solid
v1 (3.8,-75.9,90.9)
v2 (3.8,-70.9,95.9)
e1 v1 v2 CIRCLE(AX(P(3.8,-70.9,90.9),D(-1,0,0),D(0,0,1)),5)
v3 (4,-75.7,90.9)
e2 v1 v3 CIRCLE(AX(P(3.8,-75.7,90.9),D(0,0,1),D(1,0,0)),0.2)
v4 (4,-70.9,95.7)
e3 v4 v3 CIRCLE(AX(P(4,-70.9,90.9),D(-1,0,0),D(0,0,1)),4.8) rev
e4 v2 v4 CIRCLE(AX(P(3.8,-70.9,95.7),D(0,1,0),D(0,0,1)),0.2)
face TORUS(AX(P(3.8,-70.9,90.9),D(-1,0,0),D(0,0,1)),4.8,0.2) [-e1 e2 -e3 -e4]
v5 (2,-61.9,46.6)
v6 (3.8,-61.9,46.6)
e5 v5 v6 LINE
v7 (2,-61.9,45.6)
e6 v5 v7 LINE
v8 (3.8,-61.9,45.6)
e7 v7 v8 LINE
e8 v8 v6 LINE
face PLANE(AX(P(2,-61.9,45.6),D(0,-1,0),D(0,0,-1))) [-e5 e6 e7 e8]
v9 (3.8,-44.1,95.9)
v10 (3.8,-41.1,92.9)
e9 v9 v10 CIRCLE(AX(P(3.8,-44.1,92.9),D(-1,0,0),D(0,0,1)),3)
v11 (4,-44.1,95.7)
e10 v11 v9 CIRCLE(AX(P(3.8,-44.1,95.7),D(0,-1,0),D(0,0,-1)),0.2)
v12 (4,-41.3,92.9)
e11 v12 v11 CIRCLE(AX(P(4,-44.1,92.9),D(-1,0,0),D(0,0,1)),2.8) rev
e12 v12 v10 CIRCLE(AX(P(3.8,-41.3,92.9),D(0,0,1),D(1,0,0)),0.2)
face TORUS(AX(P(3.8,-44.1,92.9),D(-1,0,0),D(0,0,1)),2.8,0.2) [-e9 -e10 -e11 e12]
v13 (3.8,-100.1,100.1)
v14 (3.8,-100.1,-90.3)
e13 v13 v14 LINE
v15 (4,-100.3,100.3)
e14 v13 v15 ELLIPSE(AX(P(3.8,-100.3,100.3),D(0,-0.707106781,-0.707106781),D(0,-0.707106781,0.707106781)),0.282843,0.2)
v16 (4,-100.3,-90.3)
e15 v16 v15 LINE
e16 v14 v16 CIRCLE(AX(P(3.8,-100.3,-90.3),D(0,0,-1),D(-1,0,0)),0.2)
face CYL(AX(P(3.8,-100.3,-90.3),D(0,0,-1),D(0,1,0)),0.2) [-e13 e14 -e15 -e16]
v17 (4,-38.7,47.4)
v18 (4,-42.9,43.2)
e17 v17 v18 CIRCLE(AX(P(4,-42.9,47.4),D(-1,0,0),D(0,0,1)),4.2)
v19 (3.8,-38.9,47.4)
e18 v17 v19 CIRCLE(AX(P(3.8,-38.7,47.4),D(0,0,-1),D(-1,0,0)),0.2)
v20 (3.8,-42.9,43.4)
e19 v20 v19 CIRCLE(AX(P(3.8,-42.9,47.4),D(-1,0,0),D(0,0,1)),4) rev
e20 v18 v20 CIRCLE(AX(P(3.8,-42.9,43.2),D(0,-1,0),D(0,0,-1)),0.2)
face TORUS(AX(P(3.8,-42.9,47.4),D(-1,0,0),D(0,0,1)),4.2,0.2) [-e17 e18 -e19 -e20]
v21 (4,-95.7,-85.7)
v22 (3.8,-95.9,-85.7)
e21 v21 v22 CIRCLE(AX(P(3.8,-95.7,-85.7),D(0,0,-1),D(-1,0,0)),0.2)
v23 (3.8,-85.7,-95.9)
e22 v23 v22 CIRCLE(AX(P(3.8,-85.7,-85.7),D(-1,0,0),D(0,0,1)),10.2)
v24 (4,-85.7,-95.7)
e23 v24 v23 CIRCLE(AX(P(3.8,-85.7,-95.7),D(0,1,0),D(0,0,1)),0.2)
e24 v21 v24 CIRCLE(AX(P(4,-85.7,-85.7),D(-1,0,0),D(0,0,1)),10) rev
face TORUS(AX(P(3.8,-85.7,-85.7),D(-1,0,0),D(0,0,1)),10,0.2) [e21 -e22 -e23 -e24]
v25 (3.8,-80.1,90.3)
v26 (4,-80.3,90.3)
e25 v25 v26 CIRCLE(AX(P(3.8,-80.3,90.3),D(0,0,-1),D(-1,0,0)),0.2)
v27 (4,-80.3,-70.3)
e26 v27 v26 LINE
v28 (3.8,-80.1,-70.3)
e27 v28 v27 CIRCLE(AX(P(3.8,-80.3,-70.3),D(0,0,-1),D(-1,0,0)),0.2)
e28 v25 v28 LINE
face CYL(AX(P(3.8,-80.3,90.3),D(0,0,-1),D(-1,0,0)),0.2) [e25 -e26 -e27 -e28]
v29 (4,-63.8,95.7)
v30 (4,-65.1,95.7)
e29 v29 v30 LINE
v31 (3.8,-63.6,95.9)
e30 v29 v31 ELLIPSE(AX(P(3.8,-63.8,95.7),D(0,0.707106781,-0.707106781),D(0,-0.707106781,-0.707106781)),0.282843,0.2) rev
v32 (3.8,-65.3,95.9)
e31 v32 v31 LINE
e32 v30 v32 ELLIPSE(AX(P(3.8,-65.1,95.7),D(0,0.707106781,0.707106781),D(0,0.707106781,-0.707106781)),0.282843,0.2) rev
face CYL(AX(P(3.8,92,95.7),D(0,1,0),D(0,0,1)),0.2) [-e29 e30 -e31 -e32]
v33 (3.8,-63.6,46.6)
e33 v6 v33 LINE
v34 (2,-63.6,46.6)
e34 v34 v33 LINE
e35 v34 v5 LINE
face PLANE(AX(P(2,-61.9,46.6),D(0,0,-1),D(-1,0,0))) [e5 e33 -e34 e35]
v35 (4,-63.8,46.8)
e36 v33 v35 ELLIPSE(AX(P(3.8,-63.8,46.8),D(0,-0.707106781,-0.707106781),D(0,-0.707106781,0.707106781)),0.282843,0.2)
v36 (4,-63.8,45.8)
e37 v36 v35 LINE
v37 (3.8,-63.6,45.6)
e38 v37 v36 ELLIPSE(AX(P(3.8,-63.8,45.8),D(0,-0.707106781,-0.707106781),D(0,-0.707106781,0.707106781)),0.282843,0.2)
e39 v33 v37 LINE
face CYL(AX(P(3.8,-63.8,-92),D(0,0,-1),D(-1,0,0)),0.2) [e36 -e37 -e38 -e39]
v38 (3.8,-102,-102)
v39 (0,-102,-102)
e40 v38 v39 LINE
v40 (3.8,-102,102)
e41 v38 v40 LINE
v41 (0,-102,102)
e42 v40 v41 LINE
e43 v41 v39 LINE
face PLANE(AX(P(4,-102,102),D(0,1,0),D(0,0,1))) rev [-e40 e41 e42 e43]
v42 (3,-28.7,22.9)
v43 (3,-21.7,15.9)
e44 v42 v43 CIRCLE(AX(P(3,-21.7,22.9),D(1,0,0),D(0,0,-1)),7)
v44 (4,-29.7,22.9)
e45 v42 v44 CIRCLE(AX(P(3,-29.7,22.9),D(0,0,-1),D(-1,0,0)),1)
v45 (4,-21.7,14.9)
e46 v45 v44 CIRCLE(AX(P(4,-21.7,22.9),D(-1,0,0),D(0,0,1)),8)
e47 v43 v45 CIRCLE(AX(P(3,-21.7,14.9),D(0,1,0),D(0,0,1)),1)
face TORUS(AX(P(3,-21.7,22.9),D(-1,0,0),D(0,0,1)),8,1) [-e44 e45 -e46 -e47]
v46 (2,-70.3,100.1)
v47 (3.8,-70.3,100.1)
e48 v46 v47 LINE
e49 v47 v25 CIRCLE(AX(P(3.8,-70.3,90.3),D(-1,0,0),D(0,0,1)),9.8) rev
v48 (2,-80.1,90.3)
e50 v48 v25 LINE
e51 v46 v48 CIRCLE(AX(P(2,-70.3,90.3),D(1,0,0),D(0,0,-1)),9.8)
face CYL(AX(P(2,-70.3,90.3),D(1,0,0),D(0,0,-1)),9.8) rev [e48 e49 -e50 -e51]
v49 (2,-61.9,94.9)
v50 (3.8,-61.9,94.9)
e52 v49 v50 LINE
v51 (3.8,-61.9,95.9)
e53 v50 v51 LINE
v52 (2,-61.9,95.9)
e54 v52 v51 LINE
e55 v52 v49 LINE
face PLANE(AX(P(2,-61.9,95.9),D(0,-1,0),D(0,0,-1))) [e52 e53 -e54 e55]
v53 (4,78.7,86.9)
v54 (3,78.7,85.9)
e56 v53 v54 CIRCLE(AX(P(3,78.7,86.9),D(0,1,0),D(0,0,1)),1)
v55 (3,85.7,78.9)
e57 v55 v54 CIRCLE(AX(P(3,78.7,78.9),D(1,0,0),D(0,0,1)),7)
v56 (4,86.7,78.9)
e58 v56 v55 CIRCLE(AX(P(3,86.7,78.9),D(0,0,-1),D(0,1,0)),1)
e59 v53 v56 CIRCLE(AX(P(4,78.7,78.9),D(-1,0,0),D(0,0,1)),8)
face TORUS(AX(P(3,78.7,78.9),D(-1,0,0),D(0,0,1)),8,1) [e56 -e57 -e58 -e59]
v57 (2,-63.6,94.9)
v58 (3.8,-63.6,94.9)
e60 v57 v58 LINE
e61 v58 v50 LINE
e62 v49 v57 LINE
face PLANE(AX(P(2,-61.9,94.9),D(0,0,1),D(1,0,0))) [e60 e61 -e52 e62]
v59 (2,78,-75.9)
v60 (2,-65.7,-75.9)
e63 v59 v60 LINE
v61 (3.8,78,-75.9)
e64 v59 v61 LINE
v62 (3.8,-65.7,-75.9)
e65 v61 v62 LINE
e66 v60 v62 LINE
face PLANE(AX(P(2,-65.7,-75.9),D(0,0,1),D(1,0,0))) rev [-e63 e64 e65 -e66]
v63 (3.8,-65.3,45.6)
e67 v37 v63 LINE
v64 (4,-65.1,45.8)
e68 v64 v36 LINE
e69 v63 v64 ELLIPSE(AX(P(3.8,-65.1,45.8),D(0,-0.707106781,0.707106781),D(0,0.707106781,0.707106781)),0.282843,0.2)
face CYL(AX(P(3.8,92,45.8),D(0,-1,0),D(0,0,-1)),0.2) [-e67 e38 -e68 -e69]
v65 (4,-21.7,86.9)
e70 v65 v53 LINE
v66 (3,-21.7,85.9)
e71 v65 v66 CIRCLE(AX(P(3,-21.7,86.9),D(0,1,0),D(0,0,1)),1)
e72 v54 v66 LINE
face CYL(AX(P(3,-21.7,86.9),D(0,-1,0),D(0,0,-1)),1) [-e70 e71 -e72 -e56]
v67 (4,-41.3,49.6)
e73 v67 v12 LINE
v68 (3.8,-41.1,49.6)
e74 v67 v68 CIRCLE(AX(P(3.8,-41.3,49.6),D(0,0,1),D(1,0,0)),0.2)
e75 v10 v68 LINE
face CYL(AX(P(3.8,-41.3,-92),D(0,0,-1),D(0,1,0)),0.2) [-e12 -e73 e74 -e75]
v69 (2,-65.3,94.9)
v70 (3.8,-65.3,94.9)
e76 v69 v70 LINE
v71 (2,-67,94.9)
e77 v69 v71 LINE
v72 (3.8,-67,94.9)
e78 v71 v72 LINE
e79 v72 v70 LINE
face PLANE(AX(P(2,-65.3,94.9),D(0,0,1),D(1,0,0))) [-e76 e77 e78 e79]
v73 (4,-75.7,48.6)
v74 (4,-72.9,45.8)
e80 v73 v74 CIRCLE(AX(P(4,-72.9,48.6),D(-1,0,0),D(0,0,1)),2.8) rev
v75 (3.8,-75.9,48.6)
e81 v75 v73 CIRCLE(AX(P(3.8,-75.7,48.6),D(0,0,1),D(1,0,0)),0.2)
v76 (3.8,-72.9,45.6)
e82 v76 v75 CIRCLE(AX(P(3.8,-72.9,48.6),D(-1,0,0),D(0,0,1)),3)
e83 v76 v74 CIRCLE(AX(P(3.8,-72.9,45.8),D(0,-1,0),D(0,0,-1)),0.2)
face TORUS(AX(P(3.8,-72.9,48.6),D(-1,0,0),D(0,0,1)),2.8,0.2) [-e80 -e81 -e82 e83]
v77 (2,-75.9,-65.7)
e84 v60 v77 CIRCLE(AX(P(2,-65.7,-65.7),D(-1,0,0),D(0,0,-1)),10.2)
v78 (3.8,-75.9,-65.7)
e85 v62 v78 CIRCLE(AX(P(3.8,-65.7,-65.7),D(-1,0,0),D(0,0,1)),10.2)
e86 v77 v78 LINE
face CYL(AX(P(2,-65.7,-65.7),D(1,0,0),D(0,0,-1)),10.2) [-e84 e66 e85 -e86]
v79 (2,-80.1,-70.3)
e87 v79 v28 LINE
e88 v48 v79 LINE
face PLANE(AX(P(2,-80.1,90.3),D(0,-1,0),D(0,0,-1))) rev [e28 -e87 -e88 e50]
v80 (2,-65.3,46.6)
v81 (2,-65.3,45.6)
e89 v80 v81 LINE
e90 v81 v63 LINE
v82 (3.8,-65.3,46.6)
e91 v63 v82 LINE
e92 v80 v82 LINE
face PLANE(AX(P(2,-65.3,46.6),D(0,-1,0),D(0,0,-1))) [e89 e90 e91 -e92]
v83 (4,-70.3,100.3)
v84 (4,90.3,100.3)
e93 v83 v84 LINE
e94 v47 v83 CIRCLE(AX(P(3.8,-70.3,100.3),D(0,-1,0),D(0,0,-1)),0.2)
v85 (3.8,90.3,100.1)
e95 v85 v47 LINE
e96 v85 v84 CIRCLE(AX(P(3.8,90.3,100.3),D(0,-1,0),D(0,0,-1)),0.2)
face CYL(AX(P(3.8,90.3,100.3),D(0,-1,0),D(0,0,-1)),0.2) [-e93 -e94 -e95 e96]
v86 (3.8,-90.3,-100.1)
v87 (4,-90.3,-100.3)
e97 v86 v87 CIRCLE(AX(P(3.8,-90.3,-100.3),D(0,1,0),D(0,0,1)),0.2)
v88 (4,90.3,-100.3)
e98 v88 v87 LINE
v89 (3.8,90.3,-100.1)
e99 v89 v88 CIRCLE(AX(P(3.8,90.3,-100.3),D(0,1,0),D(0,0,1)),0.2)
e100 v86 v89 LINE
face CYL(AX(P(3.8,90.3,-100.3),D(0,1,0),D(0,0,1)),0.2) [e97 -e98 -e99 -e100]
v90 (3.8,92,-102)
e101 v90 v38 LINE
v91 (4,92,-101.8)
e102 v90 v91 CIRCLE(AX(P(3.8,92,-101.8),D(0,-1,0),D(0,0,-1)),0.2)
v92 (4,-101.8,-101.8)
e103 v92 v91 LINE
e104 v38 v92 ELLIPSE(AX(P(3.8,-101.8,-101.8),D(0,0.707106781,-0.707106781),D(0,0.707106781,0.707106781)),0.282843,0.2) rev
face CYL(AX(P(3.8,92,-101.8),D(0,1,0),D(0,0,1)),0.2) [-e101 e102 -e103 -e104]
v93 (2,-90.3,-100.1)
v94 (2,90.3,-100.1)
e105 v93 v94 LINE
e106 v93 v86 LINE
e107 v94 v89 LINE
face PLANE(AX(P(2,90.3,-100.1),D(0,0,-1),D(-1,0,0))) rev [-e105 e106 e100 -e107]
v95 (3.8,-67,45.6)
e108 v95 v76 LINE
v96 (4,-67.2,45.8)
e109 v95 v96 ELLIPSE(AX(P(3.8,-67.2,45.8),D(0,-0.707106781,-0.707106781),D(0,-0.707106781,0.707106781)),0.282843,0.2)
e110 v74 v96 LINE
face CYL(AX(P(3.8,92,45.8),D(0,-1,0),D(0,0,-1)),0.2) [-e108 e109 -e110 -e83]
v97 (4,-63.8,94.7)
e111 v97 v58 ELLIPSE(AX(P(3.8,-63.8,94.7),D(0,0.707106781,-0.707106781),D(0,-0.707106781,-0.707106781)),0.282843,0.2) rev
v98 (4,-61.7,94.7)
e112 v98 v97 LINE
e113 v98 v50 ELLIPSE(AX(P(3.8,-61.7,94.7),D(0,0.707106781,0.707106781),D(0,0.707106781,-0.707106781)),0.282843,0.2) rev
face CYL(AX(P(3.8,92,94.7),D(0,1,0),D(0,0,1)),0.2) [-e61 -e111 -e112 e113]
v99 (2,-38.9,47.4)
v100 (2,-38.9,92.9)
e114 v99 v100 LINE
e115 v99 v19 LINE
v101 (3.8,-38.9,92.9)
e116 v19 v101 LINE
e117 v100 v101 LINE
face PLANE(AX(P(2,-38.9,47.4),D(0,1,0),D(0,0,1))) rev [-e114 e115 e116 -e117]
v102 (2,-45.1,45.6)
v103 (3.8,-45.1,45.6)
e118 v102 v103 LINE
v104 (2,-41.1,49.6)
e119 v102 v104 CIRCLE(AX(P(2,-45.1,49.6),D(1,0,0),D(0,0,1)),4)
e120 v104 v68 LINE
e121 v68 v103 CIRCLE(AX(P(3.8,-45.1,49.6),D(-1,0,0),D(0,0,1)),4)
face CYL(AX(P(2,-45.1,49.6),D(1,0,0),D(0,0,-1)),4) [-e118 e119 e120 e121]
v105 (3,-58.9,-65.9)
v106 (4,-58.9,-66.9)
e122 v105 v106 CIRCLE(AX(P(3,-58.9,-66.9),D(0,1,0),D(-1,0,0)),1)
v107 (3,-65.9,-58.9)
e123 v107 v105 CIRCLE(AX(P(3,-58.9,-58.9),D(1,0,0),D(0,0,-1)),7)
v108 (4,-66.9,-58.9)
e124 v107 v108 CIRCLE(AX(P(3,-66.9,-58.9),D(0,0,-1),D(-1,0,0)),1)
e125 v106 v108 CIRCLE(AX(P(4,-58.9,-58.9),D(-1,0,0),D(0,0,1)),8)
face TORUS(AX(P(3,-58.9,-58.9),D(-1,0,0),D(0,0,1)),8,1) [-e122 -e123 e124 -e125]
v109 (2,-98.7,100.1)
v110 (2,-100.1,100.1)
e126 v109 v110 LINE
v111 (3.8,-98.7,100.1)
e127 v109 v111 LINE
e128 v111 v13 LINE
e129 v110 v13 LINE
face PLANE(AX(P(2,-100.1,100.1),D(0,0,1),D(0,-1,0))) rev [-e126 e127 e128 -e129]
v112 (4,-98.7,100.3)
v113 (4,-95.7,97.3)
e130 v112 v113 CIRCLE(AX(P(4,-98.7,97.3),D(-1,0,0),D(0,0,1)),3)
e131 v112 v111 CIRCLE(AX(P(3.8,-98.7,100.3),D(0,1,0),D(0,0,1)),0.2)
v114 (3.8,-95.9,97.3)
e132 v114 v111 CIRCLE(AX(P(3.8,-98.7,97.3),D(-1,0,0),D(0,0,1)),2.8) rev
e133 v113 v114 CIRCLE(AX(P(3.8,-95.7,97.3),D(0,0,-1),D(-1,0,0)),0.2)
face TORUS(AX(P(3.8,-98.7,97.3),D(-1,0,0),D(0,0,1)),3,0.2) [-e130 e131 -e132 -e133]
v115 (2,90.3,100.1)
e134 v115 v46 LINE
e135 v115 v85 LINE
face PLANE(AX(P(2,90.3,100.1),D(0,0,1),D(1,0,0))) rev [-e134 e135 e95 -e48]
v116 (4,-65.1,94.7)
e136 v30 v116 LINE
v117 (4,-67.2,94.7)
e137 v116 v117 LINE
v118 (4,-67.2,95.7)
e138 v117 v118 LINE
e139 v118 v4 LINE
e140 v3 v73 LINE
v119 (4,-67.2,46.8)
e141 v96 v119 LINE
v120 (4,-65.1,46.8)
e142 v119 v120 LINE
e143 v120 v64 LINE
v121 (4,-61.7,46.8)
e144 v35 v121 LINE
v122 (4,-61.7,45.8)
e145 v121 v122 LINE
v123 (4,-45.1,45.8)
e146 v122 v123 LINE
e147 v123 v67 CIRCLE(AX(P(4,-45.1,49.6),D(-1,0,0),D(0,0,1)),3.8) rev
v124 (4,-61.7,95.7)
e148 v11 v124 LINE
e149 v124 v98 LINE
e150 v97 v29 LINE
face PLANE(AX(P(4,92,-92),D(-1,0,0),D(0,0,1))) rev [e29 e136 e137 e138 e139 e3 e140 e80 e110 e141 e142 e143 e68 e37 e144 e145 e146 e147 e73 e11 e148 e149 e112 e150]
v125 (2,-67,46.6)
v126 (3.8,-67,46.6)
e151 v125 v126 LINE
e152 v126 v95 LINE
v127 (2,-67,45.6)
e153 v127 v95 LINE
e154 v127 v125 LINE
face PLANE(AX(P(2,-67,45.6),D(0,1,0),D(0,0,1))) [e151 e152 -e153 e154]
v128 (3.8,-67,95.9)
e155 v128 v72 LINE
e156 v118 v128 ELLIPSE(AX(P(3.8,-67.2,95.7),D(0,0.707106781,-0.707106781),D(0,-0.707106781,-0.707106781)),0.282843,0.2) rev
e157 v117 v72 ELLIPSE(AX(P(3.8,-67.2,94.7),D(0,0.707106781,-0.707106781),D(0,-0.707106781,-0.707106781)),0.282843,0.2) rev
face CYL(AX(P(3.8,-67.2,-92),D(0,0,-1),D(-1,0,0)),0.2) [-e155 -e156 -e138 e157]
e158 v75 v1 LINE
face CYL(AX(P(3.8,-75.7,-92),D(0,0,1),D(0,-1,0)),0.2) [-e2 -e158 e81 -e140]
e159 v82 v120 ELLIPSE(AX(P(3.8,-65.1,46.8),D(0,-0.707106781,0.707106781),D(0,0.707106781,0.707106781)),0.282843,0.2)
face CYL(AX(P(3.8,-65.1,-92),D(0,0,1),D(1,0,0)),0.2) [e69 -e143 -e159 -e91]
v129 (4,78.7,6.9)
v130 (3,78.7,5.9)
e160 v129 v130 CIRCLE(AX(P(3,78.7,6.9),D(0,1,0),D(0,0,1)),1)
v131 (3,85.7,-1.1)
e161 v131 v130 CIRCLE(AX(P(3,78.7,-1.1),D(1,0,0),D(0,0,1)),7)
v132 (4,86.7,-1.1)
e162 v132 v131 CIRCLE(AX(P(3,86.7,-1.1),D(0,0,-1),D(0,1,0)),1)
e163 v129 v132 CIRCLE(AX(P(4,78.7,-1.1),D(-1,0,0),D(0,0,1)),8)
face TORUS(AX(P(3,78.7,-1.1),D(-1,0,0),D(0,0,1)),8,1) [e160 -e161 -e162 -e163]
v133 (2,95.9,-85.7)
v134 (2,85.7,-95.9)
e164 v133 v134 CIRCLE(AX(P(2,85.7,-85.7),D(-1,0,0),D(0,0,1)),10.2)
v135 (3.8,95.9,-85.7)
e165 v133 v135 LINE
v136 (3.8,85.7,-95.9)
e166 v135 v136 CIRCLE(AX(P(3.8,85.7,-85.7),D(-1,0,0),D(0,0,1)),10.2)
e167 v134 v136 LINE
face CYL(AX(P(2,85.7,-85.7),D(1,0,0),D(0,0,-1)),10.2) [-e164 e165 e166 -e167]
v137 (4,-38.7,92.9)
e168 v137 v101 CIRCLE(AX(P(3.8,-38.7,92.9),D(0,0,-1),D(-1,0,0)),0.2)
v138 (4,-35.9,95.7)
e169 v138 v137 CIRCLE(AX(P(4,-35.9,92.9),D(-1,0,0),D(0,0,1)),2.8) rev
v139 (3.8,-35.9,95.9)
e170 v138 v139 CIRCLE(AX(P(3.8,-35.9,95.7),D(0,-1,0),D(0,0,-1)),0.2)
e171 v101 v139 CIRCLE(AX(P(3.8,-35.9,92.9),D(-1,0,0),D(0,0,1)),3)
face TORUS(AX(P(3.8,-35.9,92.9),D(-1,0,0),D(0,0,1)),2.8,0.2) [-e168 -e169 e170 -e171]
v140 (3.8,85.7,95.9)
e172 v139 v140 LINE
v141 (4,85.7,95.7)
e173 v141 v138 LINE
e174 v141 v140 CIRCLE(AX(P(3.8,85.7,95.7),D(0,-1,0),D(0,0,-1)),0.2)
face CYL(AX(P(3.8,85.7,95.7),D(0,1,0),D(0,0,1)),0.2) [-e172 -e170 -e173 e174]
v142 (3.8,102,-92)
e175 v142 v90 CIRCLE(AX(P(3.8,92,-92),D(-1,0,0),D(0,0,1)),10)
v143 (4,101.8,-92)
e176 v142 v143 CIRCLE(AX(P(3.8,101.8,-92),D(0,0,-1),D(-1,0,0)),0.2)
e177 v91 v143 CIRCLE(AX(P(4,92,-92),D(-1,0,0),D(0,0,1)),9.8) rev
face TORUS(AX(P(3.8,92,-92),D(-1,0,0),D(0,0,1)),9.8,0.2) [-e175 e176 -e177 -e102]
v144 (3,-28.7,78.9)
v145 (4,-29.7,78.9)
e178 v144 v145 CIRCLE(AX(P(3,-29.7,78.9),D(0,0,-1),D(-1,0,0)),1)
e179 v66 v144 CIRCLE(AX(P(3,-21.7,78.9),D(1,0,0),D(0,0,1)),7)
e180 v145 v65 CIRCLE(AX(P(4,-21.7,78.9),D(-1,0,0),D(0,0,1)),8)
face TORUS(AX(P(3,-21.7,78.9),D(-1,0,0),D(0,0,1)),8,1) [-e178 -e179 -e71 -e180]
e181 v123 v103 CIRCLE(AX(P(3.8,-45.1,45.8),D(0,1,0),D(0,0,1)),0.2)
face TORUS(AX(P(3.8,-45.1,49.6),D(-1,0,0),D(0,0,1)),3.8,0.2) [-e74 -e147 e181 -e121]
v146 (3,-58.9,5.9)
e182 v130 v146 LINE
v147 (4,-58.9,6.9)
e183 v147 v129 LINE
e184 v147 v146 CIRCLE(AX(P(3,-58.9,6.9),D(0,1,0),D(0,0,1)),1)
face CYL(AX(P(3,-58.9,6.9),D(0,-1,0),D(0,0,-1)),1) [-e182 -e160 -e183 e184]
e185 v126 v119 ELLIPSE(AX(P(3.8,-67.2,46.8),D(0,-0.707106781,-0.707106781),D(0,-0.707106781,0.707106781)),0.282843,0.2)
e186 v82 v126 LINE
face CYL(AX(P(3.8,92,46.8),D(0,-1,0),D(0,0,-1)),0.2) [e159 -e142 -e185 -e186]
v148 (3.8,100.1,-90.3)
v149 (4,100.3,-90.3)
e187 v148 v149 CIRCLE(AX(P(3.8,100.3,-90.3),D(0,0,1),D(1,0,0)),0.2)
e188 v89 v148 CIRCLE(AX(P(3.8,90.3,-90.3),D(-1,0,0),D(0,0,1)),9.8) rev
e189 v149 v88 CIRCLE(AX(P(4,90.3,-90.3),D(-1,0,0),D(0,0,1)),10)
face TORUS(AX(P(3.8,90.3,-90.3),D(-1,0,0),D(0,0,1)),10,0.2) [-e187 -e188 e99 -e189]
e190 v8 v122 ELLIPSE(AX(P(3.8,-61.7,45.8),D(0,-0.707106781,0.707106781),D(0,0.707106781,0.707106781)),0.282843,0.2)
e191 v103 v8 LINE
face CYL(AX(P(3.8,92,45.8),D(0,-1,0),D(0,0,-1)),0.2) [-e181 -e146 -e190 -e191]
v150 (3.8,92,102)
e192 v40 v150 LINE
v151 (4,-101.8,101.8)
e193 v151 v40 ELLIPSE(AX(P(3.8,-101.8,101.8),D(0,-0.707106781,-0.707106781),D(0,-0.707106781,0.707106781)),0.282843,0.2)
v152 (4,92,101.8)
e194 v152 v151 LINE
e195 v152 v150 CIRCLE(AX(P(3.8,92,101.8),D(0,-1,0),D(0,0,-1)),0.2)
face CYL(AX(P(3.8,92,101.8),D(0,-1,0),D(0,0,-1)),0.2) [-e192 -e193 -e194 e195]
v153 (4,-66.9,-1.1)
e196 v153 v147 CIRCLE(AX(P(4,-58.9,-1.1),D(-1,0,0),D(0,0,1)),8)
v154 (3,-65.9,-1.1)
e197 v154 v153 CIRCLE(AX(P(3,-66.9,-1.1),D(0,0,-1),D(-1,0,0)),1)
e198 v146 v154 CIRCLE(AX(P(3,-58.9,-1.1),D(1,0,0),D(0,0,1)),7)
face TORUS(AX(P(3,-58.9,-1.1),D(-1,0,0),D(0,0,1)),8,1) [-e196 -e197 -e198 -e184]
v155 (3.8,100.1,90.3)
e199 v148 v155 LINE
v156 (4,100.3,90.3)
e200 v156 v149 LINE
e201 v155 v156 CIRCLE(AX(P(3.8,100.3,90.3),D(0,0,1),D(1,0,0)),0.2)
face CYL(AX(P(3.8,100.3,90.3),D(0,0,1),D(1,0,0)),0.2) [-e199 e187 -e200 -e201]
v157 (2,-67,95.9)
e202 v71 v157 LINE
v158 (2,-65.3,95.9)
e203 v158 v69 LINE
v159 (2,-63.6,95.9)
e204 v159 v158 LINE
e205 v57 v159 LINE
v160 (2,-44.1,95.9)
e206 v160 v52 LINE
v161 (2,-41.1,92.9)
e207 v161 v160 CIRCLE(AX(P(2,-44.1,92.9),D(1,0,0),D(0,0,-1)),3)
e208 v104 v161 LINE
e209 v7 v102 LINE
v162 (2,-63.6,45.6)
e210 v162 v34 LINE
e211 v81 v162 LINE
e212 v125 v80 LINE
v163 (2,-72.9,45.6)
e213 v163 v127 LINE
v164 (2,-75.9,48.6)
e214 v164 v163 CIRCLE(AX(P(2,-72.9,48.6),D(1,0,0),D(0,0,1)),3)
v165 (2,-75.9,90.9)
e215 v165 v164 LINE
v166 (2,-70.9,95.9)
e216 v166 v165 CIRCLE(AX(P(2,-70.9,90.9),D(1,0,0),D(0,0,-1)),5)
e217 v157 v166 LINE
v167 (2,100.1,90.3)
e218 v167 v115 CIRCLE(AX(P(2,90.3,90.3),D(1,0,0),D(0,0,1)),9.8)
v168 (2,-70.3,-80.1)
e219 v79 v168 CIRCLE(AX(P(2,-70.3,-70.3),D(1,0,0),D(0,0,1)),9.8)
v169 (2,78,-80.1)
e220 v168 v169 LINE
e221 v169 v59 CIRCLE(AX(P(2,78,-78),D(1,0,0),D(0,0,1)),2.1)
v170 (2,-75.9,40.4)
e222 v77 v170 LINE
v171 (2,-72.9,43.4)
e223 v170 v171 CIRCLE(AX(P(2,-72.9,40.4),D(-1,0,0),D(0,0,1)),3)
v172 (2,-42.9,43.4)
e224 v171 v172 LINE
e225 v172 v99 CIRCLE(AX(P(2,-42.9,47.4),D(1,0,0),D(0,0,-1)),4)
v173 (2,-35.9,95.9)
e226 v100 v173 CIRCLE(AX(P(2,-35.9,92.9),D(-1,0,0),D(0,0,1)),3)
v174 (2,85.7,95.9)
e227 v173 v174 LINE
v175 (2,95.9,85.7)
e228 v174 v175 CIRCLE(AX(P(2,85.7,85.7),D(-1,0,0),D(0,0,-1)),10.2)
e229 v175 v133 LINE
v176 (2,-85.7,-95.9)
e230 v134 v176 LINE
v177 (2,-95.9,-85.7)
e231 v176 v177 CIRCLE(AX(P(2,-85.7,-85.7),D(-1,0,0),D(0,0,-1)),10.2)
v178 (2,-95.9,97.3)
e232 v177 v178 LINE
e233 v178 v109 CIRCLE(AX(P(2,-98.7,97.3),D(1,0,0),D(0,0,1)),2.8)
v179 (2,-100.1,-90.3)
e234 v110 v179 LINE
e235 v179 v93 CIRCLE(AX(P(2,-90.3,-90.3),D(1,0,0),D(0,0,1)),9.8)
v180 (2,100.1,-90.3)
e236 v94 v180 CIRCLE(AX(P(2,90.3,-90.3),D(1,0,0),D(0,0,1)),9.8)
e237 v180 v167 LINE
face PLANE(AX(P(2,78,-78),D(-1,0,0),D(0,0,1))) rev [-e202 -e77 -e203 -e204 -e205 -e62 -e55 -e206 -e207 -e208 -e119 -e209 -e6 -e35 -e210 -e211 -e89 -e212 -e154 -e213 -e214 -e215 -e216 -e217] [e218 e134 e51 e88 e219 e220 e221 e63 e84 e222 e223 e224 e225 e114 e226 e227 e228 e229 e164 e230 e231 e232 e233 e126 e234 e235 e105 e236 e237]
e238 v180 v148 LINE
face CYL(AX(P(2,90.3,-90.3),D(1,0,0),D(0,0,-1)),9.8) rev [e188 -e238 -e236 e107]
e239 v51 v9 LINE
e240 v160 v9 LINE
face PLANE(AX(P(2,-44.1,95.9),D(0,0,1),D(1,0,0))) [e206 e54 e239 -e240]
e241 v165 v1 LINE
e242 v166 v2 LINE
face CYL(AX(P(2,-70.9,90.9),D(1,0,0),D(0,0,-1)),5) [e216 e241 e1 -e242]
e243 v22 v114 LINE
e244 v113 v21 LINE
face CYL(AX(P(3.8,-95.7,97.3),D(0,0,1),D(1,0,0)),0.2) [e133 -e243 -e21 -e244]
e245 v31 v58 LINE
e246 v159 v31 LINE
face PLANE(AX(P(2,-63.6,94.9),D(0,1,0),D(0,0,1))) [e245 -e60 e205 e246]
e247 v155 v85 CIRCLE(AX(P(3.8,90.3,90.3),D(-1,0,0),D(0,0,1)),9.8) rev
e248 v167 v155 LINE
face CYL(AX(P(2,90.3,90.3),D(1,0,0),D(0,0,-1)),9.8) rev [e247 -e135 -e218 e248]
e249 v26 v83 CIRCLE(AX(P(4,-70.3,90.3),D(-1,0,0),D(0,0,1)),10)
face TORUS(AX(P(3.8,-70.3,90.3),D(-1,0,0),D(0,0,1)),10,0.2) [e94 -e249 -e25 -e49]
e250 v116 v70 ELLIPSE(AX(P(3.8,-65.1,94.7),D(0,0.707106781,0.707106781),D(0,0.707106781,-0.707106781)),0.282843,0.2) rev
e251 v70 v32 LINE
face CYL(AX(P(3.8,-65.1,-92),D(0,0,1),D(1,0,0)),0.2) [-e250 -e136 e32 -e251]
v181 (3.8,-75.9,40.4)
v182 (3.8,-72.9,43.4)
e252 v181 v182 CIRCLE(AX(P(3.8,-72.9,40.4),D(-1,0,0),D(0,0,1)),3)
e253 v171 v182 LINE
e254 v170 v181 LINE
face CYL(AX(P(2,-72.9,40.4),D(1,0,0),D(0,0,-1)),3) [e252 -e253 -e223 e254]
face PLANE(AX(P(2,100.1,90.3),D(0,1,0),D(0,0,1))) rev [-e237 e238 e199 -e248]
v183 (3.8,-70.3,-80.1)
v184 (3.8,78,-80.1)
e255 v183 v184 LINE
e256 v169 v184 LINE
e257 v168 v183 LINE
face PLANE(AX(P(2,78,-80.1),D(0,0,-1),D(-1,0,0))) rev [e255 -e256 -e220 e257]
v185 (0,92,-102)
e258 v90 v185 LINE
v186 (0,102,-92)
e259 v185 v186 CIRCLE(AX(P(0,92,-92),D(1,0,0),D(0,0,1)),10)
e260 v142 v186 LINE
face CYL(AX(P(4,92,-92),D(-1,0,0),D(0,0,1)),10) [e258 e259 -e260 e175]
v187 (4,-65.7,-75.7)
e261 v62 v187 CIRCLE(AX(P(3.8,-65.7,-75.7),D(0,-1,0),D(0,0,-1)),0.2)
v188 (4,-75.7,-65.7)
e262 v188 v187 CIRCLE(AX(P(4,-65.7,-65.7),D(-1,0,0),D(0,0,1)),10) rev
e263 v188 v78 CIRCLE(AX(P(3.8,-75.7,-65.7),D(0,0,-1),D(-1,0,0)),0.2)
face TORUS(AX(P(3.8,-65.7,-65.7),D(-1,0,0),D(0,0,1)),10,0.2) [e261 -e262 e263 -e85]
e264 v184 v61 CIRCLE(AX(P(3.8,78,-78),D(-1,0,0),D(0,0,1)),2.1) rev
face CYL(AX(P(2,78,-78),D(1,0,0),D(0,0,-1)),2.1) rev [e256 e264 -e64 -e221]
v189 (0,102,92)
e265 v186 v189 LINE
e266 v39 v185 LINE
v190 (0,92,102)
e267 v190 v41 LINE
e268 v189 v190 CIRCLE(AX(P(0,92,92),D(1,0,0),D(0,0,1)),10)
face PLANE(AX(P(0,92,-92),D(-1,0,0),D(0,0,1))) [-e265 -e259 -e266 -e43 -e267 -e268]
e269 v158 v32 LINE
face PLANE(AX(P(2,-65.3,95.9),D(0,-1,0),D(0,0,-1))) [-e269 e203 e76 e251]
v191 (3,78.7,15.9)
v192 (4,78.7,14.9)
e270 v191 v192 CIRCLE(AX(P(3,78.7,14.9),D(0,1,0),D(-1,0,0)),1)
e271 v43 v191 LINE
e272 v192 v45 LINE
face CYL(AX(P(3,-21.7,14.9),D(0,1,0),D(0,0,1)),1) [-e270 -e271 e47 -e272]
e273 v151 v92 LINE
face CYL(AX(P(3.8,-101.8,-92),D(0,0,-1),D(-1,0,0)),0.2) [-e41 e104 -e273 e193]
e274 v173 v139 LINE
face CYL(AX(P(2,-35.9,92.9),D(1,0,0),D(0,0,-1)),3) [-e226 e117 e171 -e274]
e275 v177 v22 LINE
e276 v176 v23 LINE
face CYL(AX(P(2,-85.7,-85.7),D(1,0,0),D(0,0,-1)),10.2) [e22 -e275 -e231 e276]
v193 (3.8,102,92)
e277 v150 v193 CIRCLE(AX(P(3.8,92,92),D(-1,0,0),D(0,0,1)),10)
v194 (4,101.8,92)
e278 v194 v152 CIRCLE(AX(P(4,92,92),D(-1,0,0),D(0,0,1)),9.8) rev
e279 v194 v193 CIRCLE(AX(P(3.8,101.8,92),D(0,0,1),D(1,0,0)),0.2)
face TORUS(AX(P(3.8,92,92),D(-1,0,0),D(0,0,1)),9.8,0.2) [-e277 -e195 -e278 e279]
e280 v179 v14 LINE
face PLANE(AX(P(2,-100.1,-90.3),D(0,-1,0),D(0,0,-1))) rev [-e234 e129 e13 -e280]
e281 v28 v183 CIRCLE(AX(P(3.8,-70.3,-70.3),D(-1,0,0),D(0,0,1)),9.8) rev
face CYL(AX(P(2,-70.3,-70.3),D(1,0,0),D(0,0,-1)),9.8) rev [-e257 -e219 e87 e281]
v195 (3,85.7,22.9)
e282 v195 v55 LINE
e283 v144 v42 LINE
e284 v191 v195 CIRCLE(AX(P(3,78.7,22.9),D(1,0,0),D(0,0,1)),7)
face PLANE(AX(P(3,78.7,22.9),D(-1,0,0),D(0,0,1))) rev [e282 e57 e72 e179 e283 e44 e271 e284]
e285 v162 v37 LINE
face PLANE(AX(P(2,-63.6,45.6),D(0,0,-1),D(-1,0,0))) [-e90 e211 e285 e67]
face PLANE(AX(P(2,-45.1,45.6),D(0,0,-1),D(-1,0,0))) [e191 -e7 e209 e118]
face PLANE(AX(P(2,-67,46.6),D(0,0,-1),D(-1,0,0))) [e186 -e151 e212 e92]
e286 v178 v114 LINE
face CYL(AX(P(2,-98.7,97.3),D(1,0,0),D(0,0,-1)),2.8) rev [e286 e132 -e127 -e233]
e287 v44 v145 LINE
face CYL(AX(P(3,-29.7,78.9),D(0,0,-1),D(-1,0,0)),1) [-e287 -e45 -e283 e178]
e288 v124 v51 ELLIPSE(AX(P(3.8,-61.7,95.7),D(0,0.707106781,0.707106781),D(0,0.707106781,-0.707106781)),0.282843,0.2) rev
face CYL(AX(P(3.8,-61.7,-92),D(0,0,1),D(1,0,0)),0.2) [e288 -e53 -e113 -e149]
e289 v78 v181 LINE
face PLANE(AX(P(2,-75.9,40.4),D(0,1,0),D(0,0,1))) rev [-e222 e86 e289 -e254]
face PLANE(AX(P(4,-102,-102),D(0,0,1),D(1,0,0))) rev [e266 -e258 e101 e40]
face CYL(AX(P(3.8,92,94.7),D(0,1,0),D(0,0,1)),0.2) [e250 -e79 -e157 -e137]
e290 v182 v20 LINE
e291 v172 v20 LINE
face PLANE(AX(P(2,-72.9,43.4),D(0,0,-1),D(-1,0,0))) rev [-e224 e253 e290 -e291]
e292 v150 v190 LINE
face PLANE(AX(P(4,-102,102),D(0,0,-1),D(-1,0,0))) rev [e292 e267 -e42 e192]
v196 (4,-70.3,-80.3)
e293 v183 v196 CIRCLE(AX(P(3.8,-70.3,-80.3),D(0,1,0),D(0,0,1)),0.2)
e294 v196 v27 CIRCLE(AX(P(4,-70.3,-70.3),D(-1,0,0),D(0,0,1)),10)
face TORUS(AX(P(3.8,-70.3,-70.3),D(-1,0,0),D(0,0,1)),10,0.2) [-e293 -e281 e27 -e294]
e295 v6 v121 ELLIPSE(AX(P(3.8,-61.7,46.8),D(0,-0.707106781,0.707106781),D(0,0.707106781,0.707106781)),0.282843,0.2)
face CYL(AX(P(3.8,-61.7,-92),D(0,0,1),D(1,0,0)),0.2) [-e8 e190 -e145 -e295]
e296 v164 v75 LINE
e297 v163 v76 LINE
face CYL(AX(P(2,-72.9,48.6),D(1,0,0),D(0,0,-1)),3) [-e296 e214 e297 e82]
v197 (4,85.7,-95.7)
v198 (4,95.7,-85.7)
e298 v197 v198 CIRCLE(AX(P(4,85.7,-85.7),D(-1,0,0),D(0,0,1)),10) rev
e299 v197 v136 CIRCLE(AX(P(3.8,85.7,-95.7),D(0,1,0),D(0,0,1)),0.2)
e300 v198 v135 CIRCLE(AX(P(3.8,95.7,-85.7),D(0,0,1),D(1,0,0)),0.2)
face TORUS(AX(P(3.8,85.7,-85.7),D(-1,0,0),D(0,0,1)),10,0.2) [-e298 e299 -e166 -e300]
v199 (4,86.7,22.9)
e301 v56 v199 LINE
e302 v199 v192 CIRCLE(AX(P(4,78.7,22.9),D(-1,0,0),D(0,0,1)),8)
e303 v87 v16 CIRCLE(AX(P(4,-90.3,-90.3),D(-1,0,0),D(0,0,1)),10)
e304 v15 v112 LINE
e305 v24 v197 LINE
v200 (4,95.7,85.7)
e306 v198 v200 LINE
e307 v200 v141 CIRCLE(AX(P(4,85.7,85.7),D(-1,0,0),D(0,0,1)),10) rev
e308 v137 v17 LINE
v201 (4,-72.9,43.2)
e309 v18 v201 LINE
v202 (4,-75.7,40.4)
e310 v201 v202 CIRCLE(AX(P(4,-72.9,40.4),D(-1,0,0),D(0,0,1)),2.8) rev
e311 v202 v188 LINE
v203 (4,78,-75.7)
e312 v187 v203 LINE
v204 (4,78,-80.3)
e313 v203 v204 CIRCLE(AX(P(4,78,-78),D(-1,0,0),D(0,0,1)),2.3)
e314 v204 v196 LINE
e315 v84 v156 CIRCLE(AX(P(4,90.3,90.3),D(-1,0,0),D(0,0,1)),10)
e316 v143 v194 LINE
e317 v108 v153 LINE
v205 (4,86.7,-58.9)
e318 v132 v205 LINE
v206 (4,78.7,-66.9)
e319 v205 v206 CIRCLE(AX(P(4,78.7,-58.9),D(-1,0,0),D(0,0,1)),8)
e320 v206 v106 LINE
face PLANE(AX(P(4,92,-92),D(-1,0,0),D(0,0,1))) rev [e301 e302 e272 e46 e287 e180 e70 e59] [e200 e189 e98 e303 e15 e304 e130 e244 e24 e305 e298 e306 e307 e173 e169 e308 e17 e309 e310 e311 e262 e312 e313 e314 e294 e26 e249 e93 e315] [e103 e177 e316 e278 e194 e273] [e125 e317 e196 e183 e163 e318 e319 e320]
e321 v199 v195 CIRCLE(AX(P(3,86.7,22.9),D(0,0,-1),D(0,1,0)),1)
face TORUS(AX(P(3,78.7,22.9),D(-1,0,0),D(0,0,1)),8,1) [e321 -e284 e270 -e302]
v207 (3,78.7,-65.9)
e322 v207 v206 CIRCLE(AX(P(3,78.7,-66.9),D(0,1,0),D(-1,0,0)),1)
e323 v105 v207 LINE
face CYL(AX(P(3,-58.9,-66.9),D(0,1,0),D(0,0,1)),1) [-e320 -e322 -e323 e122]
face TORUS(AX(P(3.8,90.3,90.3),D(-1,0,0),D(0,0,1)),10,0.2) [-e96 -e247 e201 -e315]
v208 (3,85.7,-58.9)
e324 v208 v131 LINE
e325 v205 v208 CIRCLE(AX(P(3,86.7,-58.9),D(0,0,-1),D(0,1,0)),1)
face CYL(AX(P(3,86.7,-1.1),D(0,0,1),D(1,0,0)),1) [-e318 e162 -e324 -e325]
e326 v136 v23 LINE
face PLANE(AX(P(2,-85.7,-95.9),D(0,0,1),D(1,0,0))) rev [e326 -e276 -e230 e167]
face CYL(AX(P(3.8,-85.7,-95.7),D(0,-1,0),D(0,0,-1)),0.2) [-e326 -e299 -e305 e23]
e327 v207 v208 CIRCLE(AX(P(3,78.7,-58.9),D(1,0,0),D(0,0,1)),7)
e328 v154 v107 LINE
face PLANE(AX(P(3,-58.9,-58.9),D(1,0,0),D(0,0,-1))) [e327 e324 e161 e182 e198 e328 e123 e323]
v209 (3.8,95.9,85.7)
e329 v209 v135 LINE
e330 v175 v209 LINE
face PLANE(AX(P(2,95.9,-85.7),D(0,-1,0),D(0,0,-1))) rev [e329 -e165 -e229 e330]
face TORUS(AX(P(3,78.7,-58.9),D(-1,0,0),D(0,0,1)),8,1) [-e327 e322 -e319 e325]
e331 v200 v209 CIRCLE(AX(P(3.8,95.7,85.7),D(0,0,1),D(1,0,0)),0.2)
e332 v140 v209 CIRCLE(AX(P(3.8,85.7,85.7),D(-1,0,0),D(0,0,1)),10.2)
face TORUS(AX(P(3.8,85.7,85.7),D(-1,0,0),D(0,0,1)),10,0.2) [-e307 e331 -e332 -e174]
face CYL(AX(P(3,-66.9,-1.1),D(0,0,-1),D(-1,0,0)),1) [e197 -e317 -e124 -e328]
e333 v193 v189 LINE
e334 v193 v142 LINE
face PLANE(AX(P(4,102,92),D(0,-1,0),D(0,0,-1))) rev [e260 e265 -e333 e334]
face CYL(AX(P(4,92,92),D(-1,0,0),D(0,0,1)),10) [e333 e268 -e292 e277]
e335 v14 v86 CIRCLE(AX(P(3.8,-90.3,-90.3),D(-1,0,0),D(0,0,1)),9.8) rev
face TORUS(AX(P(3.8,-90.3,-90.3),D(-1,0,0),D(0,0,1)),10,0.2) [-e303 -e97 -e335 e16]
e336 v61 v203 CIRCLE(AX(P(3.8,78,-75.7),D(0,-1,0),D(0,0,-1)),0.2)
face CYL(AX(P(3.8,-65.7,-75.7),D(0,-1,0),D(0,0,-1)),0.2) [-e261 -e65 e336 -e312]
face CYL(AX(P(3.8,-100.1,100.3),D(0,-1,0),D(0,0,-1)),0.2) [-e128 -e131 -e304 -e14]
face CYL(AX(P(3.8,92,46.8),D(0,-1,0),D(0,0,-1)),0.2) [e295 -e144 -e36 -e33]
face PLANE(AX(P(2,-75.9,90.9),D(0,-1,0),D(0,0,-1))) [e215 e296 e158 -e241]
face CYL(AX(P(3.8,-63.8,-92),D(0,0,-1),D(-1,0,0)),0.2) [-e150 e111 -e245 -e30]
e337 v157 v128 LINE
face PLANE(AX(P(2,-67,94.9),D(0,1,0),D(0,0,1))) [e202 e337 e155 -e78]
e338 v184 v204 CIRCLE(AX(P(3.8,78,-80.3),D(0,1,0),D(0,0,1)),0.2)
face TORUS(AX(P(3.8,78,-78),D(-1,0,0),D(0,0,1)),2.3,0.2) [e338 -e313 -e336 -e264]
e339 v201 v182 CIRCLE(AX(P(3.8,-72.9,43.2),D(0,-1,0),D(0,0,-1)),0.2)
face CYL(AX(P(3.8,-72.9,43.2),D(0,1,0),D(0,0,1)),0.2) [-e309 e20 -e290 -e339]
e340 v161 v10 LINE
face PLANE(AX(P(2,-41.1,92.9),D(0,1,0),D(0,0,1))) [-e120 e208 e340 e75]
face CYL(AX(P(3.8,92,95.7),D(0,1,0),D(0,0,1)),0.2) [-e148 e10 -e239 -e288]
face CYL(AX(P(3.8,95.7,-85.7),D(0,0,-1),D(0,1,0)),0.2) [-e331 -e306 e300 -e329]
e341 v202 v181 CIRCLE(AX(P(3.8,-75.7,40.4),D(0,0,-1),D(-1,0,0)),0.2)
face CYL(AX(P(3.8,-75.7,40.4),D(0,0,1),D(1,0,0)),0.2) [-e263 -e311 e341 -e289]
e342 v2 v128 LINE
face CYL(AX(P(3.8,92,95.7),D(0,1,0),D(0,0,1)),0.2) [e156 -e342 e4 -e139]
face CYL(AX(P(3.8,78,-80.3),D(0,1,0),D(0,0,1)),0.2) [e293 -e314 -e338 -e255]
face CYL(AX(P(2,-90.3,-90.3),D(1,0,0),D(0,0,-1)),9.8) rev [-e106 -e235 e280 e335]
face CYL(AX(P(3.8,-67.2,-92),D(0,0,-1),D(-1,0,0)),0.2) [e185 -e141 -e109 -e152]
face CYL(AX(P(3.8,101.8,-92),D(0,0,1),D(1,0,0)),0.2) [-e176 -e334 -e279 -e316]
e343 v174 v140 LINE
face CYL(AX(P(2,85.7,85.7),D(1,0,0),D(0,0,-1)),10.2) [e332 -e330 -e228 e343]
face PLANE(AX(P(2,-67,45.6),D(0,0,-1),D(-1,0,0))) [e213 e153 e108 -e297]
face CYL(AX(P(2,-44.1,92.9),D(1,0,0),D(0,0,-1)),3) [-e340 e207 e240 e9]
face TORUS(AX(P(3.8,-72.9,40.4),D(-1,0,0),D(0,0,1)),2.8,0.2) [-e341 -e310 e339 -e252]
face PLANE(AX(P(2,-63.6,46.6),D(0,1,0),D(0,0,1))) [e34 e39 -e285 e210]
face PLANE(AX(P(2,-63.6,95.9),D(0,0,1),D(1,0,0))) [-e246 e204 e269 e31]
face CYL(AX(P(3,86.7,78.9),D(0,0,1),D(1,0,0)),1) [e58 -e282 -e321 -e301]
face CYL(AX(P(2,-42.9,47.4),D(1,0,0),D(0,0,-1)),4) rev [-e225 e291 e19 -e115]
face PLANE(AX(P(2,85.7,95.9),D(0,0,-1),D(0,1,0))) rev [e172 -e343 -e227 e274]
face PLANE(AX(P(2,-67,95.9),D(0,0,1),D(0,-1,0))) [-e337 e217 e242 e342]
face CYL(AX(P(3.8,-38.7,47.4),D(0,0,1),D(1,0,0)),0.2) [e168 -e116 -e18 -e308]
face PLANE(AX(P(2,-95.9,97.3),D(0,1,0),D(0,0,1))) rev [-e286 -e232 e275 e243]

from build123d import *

# Parameters (mm, degrees)
BOSS_EXTRUDE1_DEPTH = 4
CUT_EXTRUDE3_DEPTH  = 2
FILLET1_R           = 0.2
CUT_EXTRUDE4_DEPTH  = 1
FILLET2_R           = 1


with BuildPart() as part:
    # Sketch1 → Boss-Extrude1 (new body)
    with BuildSketch(Plane(origin=(0, 0, 0), x_dir=(0, 0, -1), z_dir=(1, 0, 0))):
        with BuildLine():
            Line((-102, -102), (102, -102))
            Line((102, -102), (102, 92))
            ThreePointArc((102, 92), (99.071067812, 99.071067812), (92, 102))
            Line((92, 102), (-92, 102))
            ThreePointArc((-92, 102), (-99.071067812, 99.071067812), (-102, 92))
            Line((-102, 92), (-102, -102))
        make_face()
    extrude(amount=BOSS_EXTRUDE1_DEPTH)

    # Sketch2 → Cut-Extrude3 (cut)
    with BuildSketch(Plane(origin=(4, 0, 0), x_dir=(0, 0, -1), z_dir=(1, 0, 0))):
        with BuildLine():
            Line((-100.1, 90.3), (-100.1, -70.3))
            ThreePointArc((-100.1, -70.3), (-97.229646456, -77.229646456), (-90.3, -80.1))
            Line((-90.3, -80.1), (70.3, -80.1))
            ThreePointArc((70.3, -80.1), (77.229646456, -77.229646456), (80.1, -70.3))
            Line((80.1, -70.3), (80.1, 78))
            ThreePointArc((80.1, 78), (78, 80.1), (75.9, 78))
            Line((75.9, 78), (75.9, -65.7))
            ThreePointArc((75.9, -65.7), (72.912489168, -72.912489168), (65.7, -75.9))
            Line((65.7, -75.9), (-40.4, -75.9))
            ThreePointArc((-40.4, -75.9), (-42.521320344, -75.021320344), (-43.4, -72.9))
            Line((-43.4, -72.9), (-43.4, -42.9))
            ThreePointArc((-43.4, -42.9), (-44.571572875, -40.071572875), (-47.4, -38.9))
            Line((-47.4, -38.9), (-92.9, -38.9))
            ThreePointArc((-92.9, -38.9), (-95.021320344, -38.021320344), (-95.9, -35.9))
            Line((-95.9, -35.9), (-95.9, 85.7))
            ThreePointArc((-95.9, 85.7), (-92.912489168, 92.912489168), (-85.7, 95.9))
            Line((-85.7, 95.9), (85.7, 95.9))
            ThreePointArc((85.7, 95.9), (92.912489168, 92.912489168), (95.9, 85.7))
            Line((95.9, 85.7), (95.9, -85.7))
            ThreePointArc((95.9, -85.7), (92.912489168, -92.912489168), (85.7, -95.9))
            Line((85.7, -95.9), (-97.3, -95.9))
            ThreePointArc((-97.3, -95.9), (-99.279898987, -96.720101013), (-100.1, -98.7))
            Line((-100.1, -98.7), (-100.1, -100.1))
            Line((-100.1, -100.1), (90.3, -100.1))
            ThreePointArc((90.3, -100.1), (97.229646456, -97.229646456), (100.1, -90.3))
            Line((100.1, -90.3), (100.1, 90.3))
            ThreePointArc((100.1, 90.3), (97.229646456, 97.229646456), (90.3, 100.1))
            Line((90.3, 100.1), (-90.3, 100.1))
            ThreePointArc((-90.3, 100.1), (-97.229646456, 97.229646456), (-100.1, 90.3))
        make_face()
        with BuildLine():
            Line((-90.9, -75.9), (-48.6, -75.9))
            ThreePointArc((-48.6, -75.9), (-46.478679656, -75.021320344), (-45.6, -72.9))
            Line((-45.6, -72.9), (-45.6, -67))
            Line((-45.6, -67), (-46.6, -67))
            Line((-46.6, -67), (-46.6, -65.3))
            Line((-46.6, -65.3), (-45.6, -65.3))
            Line((-45.6, -65.3), (-45.6, -63.6))
            Line((-45.6, -63.6), (-46.6, -63.6))
            Line((-46.6, -63.6), (-46.6, -61.9))
            Line((-46.6, -61.9), (-45.6, -61.9))
            Line((-45.6, -61.9), (-45.6, -45.1))
            ThreePointArc((-45.6, -45.1), (-46.771572875, -42.271572875), (-49.6, -41.1))
            Line((-49.6, -41.1), (-92.9, -41.1))
            ThreePointArc((-92.9, -41.1), (-95.021320344, -41.978679656), (-95.9, -44.1))
            Line((-95.9, -44.1), (-95.9, -61.9))
            Line((-95.9, -61.9), (-94.9, -61.9))
            Line((-94.9, -61.9), (-94.9, -63.6))
            Line((-94.9, -63.6), (-95.9, -63.6))
            Line((-95.9, -63.6), (-95.9, -65.3))
            Line((-95.9, -65.3), (-94.9, -65.3))
            Line((-94.9, -65.3), (-94.9, -67))
            Line((-94.9, -67), (-95.9, -67))
            Line((-95.9, -67), (-95.9, -70.9))
            ThreePointArc((-95.9, -70.9), (-94.435533906, -74.435533906), (-90.9, -75.9))
        make_face(mode=Mode.SUBTRACT)
    extrude(amount=-CUT_EXTRUDE3_DEPTH, mode=Mode.SUBTRACT)

    # Fillet1
    fillet1_edges = [part.edges().sort_by_distance(p)[0] for p in [
        (4, 102, 0),
        (4, 99.071067812, 99.071067812),
        (4, -5, 102),
        (4, -102, 0),
        (4, -5, -102),
        (4, 80.1, -78),
        (4, 6.15, -75.9),
        (4, -72.912489168, -72.912489168),
        (4, -75.9, -12.65),
        (4, -75.021320344, 42.521320344),
        (4, -57.9, 43.4),
        (4, -40.071572875, 44.571572875),
        (4, -38.9, 70.15),
        (4, -38.021320344, 95.021320344),
        (4, 24.9, 95.9),
        (4, 92.912489168, 92.912489168),
        (4, 95.9, 0),
        (4, 92.912489168, -92.912489168),
        (4, 0, -95.9),
        (4, -92.912489168, -92.912489168),
        (4, -95.9, 5.8),
        (4, -96.720101013, 99.279898987),
        (4, -99.4, 100.1),
        (4, -100.1, 4.9),
        (4, -97.229646456, -97.229646456),
        (4, 0, -100.1),
        (4, 97.229646456, -97.229646456),
        (4, 100.1, 0),
        (4, 97.229646456, 97.229646456),
        (4, 10, 100.1),
        (4, -77.229646456, 97.229646456),
        (4, -80.1, 10),
        (4, -77.229646456, -77.229646456),
        (4, 3.85, -80.1),
        (4, -74.435533906, 94.435533906),
        (4, -68.95, 95.9),
        (4, -67, 95.4),
        (4, -66.15, 94.9),
        (4, -65.3, 95.4),
        (4, -64.45, 95.9),
        (4, -63.6, 95.4),
        (4, -62.75, 94.9),
        (4, -61.9, 95.4),
        (4, -53, 95.9),
        (4, -41.978679656, 95.021320344),
        (4, -41.1, 71.25),
        (4, -42.271572875, 46.771572875),
        (4, -53.5, 45.6),
        (4, -61.9, 46.1),
        (4, -62.75, 46.6),
        (4, -63.6, 46.1),
        (4, -64.45, 45.6),
        (4, -65.3, 46.1),
        (4, -66.15, 46.6),
        (4, -67, 46.1),
        (4, -69.95, 45.6),
        (4, -75.021320344, 46.478679656),
        (4, -75.9, 69.75),
        (4, 99.071067812, -99.071067812),
    ]]
    fillet(fillet1_edges, radius=FILLET1_R)

    # Sketch3 → Cut-Extrude4 (cut)
    with BuildSketch(Plane(origin=(4, 0, 0), x_dir=(0, 0, -1), z_dir=(1, 0, 0))):
        with BuildLine():
            Line((-78.9, -28.7), (-22.9, -28.7))
            ThreePointArc((-22.9, -28.7), (-17.950252532, -26.649747468), (-15.9, -21.7))
            Line((-15.9, -21.7), (-15.9, 78.7))
            ThreePointArc((-15.9, 78.7), (-17.950252532, 83.649747468), (-22.9, 85.7))
            Line((-22.9, 85.7), (-78.9, 85.7))
            ThreePointArc((-78.9, 85.7), (-83.849747468, 83.649747468), (-85.9, 78.7))
            Line((-85.9, 78.7), (-85.9, -21.7))
            ThreePointArc((-85.9, -21.7), (-83.849747468, -26.649747468), (-78.9, -28.7))
        make_face()
        with BuildLine():
            Line((1.1, -65.9), (58.9, -65.9))
            ThreePointArc((58.9, -65.9), (63.849747468, -63.849747468), (65.9, -58.9))
            Line((65.9, -58.9), (65.9, 78.7))
            ThreePointArc((65.9, 78.7), (63.849747468, 83.649747468), (58.9, 85.7))
            Line((58.9, 85.7), (1.1, 85.7))
            ThreePointArc((1.1, 85.7), (-3.849747468, 83.649747468), (-5.9, 78.7))
            Line((-5.9, 78.7), (-5.9, -58.9))
            ThreePointArc((-5.9, -58.9), (-3.849747468, -63.849747468), (1.1, -65.9))
        make_face()
    extrude(amount=-CUT_EXTRUDE4_DEPTH, mode=Mode.SUBTRACT)

    # Fillet2
    fillet2_edges = [part.edges().sort_by_distance(p)[0] for p in [
        (4, 83.649747468, -63.849747468),
        (4, 9.9, -65.9),
        (4, -63.849747468, -63.849747468),
        (4, -65.9, -30),
        (4, -63.849747468, 3.849747468),
        (4, 9.9, 5.9),
        (4, 83.649747468, 3.849747468),
        (4, 83.649747468, 17.950252532),
        (4, 28.5, 15.9),
        (4, -26.649747468, 17.950252532),
        (4, -28.7, 50.9),
        (4, -26.649747468, 83.849747468),
        (4, 28.5, 85.9),
        (4, 83.649747468, 83.849747468),
        (4, 85.7, -30),
        (4, 85.7, 50.9),
    ]]
    fillet(fillet2_edges, radius=FILLET2_R - 0.0001)  # a hair under: the kernel refuses the full size


solid = part.part
